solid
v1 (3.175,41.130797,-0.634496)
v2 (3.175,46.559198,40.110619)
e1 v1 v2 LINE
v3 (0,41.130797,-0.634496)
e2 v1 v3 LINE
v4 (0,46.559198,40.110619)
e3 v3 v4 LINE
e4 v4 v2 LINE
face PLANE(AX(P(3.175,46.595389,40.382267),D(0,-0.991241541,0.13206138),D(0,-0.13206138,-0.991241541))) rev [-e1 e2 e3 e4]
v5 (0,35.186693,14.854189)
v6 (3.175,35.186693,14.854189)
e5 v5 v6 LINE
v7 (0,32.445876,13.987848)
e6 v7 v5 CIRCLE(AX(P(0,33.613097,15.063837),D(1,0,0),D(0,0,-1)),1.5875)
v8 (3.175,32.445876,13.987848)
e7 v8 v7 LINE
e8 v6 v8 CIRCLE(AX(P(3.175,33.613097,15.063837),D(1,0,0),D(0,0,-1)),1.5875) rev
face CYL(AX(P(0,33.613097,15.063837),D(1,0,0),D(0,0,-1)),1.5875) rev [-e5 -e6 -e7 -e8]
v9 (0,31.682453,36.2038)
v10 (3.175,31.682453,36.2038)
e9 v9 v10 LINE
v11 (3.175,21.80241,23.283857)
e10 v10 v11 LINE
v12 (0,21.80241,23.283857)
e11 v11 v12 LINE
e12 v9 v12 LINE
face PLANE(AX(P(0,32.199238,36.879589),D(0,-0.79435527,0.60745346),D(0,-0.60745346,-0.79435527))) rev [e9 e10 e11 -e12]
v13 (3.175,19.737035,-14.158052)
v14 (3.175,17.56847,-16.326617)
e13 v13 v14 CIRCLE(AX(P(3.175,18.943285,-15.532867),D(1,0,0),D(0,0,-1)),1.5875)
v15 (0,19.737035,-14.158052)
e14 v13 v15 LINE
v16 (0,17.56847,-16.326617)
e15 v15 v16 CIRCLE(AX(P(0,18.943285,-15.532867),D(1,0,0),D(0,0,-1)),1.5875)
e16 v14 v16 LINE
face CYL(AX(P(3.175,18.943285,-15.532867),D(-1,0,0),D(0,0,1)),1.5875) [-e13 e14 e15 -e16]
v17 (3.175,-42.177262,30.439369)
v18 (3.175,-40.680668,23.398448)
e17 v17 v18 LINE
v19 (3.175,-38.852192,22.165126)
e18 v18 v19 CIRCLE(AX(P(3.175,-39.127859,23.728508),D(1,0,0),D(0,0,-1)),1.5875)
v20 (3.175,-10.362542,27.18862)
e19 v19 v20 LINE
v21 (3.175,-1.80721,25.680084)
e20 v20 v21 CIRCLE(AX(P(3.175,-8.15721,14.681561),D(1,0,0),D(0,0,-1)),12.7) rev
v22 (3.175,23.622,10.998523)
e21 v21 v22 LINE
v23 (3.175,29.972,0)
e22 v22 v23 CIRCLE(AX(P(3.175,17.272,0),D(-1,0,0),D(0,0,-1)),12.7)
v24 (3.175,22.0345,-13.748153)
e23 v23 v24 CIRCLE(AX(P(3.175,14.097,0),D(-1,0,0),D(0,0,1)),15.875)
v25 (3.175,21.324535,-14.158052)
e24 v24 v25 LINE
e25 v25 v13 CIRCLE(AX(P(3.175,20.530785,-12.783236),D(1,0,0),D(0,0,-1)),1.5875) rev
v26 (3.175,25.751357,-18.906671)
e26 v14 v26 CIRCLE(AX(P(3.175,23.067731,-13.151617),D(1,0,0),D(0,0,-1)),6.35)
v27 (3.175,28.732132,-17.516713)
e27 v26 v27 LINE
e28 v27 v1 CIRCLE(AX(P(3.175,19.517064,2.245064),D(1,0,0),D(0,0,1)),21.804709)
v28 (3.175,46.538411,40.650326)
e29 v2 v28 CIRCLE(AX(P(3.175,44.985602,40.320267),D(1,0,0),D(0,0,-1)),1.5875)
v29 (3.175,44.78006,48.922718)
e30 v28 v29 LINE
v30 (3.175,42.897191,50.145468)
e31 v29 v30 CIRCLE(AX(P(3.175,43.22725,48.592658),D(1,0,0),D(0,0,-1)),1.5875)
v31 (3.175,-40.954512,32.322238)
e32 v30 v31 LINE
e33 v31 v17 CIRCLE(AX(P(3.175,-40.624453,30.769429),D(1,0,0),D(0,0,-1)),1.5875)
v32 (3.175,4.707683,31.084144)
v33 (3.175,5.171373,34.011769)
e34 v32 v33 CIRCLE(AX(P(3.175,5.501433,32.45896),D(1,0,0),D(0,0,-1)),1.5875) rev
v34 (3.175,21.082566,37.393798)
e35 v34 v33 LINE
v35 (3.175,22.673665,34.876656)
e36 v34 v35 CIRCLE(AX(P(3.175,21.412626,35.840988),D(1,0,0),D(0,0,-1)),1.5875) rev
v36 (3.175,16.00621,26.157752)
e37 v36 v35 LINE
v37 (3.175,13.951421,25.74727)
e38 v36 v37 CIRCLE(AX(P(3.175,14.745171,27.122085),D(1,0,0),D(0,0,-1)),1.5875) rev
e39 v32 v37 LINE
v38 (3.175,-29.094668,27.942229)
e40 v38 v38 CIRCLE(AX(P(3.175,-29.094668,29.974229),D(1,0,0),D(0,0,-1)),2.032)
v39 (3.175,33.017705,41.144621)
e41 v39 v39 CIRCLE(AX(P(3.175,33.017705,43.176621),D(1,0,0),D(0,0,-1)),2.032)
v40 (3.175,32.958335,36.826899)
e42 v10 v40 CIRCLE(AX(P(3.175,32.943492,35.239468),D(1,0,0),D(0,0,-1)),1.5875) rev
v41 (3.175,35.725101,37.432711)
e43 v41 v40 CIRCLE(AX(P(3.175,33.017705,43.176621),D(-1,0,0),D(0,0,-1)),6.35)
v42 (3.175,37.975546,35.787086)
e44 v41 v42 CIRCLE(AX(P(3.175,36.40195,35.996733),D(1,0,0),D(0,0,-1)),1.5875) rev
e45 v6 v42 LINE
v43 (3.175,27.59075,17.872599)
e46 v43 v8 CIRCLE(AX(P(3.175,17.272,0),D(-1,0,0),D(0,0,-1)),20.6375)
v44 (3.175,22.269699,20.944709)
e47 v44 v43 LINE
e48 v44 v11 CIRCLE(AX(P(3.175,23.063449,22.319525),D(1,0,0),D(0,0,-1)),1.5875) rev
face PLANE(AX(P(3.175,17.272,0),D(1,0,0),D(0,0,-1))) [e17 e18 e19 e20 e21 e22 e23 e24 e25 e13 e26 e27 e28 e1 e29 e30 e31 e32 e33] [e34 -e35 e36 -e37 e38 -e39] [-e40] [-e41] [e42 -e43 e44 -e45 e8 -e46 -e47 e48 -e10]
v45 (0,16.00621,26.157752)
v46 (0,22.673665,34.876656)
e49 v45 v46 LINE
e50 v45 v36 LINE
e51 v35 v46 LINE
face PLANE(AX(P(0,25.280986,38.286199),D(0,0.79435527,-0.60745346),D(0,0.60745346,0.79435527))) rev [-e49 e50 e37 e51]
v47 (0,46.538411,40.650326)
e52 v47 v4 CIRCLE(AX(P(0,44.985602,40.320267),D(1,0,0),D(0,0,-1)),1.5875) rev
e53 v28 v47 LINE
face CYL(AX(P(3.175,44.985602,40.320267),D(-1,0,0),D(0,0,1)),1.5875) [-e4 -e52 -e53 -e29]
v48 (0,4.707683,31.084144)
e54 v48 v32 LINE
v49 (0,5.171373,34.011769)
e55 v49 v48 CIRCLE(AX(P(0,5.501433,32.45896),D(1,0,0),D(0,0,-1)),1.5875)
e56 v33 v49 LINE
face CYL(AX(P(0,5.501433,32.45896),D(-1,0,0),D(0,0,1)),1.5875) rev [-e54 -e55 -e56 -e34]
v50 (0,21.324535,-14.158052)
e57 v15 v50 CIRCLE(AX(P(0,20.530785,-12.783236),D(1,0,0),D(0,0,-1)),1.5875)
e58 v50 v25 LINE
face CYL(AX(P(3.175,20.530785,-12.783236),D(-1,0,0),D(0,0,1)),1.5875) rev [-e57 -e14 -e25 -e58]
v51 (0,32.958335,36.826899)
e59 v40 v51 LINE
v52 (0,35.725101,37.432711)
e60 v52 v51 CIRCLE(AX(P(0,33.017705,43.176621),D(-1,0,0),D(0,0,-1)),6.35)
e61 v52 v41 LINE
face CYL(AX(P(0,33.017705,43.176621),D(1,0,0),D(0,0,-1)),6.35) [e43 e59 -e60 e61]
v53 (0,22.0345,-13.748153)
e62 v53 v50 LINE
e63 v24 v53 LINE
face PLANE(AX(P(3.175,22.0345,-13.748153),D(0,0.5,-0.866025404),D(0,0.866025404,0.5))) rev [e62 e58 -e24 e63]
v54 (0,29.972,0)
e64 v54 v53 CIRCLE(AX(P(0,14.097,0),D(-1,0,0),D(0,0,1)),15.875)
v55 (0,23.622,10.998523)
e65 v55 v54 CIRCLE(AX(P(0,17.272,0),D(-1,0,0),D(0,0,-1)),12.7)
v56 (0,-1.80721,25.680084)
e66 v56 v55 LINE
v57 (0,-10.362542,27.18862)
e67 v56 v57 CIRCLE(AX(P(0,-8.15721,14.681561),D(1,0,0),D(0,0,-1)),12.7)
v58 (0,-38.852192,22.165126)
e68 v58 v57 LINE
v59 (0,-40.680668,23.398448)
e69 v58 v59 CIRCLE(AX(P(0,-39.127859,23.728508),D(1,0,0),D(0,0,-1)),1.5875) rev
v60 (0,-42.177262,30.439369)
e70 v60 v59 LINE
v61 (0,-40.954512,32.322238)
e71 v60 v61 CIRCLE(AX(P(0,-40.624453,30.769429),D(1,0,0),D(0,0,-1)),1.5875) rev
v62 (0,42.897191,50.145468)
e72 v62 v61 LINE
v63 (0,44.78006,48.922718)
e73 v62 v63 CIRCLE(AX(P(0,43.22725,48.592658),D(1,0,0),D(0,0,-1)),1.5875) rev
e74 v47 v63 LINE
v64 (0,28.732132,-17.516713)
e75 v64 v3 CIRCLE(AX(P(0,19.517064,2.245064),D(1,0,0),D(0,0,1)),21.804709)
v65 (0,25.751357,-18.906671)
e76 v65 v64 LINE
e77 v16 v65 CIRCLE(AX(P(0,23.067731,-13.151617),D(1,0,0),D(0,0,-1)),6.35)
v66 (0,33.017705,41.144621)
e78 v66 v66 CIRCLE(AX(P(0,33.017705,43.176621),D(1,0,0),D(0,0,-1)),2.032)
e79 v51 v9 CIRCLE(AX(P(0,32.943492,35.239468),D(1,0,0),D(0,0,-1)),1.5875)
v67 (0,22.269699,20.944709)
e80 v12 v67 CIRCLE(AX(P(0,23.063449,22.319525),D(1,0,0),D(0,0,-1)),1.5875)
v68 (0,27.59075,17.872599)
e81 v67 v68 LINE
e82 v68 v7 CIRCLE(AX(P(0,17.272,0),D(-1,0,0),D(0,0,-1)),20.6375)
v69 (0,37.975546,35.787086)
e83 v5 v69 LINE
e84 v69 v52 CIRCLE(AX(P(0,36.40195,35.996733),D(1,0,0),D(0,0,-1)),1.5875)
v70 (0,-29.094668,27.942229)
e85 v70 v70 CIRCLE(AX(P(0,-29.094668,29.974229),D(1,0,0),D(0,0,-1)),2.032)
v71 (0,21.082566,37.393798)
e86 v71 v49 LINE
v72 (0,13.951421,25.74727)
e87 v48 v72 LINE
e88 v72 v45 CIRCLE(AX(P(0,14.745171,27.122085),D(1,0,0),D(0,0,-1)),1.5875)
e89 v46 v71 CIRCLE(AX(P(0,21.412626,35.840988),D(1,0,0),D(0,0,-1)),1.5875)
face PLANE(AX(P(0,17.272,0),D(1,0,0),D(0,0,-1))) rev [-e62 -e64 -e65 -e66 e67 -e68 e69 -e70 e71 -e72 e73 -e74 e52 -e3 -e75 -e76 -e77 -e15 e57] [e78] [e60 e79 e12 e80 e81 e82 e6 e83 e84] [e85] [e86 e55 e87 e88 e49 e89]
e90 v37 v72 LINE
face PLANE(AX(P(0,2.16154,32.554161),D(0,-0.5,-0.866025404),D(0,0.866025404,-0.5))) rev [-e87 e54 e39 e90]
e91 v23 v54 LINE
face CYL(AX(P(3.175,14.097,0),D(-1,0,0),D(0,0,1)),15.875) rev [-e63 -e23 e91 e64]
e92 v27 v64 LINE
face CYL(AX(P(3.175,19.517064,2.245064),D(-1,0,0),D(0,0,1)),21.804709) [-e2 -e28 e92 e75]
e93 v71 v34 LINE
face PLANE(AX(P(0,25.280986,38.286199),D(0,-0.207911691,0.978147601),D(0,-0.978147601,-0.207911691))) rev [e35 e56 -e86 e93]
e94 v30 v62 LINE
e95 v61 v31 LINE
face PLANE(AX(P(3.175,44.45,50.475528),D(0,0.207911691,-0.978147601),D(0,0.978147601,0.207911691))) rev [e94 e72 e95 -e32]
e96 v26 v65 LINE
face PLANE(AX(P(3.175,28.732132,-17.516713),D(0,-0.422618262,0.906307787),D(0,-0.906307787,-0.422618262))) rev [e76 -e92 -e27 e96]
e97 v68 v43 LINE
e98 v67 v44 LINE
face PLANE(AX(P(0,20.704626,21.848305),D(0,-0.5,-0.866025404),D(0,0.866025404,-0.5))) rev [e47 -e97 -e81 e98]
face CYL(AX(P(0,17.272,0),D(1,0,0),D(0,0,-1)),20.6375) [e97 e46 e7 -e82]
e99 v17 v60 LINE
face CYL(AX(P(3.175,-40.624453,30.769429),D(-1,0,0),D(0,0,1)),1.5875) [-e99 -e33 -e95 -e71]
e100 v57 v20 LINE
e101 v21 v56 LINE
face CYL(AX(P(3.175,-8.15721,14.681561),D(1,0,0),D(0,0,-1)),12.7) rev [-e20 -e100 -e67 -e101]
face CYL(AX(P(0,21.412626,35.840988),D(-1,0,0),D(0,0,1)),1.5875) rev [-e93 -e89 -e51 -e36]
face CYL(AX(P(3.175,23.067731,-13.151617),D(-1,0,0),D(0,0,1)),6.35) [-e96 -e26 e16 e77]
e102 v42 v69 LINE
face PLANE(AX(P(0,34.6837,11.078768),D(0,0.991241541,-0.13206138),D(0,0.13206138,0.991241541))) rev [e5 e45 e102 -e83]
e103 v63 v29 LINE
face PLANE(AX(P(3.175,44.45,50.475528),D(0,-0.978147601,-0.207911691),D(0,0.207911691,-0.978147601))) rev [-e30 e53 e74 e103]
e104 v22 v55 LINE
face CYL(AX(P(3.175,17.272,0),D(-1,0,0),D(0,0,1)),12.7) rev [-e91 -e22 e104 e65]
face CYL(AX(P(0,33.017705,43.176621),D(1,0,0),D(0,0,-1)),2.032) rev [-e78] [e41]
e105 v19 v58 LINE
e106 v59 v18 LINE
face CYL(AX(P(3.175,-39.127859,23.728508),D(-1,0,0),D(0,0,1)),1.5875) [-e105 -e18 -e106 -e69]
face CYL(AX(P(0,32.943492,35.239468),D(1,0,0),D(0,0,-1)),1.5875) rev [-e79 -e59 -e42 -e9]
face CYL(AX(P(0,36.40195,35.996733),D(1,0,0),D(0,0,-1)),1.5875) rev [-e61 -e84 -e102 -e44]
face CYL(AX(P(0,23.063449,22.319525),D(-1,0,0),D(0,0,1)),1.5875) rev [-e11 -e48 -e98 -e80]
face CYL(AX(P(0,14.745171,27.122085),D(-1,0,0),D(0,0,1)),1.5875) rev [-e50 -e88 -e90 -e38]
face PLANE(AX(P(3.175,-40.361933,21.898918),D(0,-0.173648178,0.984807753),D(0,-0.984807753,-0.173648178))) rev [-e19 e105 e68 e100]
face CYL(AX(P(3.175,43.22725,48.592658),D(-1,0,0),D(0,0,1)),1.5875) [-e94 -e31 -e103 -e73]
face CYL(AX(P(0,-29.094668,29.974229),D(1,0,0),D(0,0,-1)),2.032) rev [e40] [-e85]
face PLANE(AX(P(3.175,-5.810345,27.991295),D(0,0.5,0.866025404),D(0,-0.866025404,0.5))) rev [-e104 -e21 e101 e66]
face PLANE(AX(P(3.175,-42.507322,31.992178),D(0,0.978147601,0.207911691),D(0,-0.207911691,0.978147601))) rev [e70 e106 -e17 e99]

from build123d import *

# Parameters (mm, degrees)
BOSS_EXTRUDE1_DEPTH = 3.175
FILLET1_R           = 12.7
FILLET2_R           = 1.5875
FILLET3_R           = 1.5875
SKETCH2_R           = 2.032
CUT_EXTRUDE1_DEPTH  = 69.535995798
FILLET4_R           = 1.5875


with BuildPart() as part:
    # Sketch1 → Boss-Extrude1 (new body)
    with BuildSketch(Plane(origin=(0, 0, 0), x_dir=(0, 0, -1), z_dir=(1, 0, 0))):
        with BuildLine():
            Line((13.748153285, 22.0345), (14.739116884, 20.318100699))
            ThreePointArc((14.739116884, 20.318100699), (14.158051555, 18.149535371), (16.326616884, 17.568470042))
            ThreePointArc((16.326616884, 17.568470042), (19.207719521, 21.158249529), (18.906671331, 25.751357318))
            Line((18.906671331, 25.751357318), (17.516713222, 28.732132102))
            ThreePointArc((17.516713222, 28.732132102), (10.661882173, 37.091365139), (0.634495892, 41.130797035))
            Line((0.634495892, 41.130797035), (-40.382266976, 46.59538876))
            Line((-40.382266976, 46.59538876), (-50.475527532, 44.45))
            Line((-50.475527532, 44.45), (-31.992178218, -42.507321705))
            Line((-31.992178218, -42.507321705), (-21.898917663, -40.361932946))
            Line((-21.898917663, -40.361932946), (-27.991294866, -5.810344877))
            Line((-27.991294866, -5.810344877), (-10.998522628, 23.622))
            ThreePointArc((-10.998522628, 23.622), (-6.35, 28.270522628), (0, 29.972))
            ThreePointArc((0, 29.972), (7.9375, 27.845153285), (13.748153285, 22.0345))
        make_face()
    extrude(amount=BOSS_EXTRUDE1_DEPTH)

    # Fillet1
    fillet1_edges = [part.edges().sort_by_distance(p)[0] for p in [
        (1.5875, -5.810344877, 27.991294866),
    ]]
    fillet(fillet1_edges, radius=FILLET1_R)

    # Fillet2
    fillet2_edges = [part.edges().sort_by_distance(p)[0] for p in [
        (1.5875, -40.361932946, 21.898917663),
        (1.5875, -42.507321705, 31.992178218),
        (1.5875, 44.45, 50.475527532),
        (1.5875, 46.59538876, 40.382266976),
    ]]
    fillet(fillet2_edges, radius=FILLET2_R)

    # Fillet3
    fillet3_edges = [part.edges().sort_by_distance(p)[0] for p in [
        (1.5875, 20.318100699, -14.739116884),
    ]]
    fillet(fillet3_edges, radius=FILLET3_R)

    # Sketch2 → Cut-Extrude1 (cut, through all)
    with BuildSketch(Plane(origin=(3.175, 0, 0), x_dir=(0, 0, -1), z_dir=(1, 0, 0))):
        with Locations((-43.17662111, 33.017704898)):
            Circle(SKETCH2_R)
        with Locations((-29.974228743, -29.094667748)):
            Circle(SKETCH2_R)
        with BuildLine():
            Line((-21.848305026, 20.704625636), (-17.872599271, 27.59075))
            ThreePointArc((-17.872599271, 27.59075), (-14.903788227, 31.547275925), (-11.078768079, 34.683700207))
            Line((-11.078768079, 34.683700207), (-40.047392283, 38.543139447))
            ThreePointArc((-40.047392283, 38.543139447), (-37.495523437, 35.854539267), (-36.879589172, 32.199237568))
            Line((-36.879589172, 32.199237568), (-21.848305026, 20.704625636))
        make_face()
        with BuildLine():
            Line((-38.286199293, 25.280985715), (-25.05001183, 15.159106781))
            Line((-25.05001183, 15.159106781), (-32.554160521, 2.161539981))
            ThreePointArc((-32.554160521, 2.161539981), (-32.855452365, 1.621137898), (-33.140409238, 1.071946887))
            Line((-33.140409238, 1.071946887), (-38.286199293, 25.280985715))
        make_face()
    extrude(amount=-CUT_EXTRUDE1_DEPTH, mode=Mode.SUBTRACT)

    # Fillet4
    fillet4_edges = [part.edges().sort_by_distance(p)[0] for p in [
        (1.5875, 20.704625636, 21.848305026),
        (1.5875, 34.683700207, 11.078768079),
        (1.5875, 38.543139447, 40.047392283),
        (1.5875, 32.199237568, 36.879589172),
        (1.5875, 25.280985715, 38.286199293),
        (1.5875, 1.071946887, 33.140409238),
        (1.5875, 15.159106781, 25.05001183),
    ]]
    fillet(fillet4_edges, radius=FILLET4_R - 0.0001)  # a hair under: the kernel refuses the full size


solid = part.part
